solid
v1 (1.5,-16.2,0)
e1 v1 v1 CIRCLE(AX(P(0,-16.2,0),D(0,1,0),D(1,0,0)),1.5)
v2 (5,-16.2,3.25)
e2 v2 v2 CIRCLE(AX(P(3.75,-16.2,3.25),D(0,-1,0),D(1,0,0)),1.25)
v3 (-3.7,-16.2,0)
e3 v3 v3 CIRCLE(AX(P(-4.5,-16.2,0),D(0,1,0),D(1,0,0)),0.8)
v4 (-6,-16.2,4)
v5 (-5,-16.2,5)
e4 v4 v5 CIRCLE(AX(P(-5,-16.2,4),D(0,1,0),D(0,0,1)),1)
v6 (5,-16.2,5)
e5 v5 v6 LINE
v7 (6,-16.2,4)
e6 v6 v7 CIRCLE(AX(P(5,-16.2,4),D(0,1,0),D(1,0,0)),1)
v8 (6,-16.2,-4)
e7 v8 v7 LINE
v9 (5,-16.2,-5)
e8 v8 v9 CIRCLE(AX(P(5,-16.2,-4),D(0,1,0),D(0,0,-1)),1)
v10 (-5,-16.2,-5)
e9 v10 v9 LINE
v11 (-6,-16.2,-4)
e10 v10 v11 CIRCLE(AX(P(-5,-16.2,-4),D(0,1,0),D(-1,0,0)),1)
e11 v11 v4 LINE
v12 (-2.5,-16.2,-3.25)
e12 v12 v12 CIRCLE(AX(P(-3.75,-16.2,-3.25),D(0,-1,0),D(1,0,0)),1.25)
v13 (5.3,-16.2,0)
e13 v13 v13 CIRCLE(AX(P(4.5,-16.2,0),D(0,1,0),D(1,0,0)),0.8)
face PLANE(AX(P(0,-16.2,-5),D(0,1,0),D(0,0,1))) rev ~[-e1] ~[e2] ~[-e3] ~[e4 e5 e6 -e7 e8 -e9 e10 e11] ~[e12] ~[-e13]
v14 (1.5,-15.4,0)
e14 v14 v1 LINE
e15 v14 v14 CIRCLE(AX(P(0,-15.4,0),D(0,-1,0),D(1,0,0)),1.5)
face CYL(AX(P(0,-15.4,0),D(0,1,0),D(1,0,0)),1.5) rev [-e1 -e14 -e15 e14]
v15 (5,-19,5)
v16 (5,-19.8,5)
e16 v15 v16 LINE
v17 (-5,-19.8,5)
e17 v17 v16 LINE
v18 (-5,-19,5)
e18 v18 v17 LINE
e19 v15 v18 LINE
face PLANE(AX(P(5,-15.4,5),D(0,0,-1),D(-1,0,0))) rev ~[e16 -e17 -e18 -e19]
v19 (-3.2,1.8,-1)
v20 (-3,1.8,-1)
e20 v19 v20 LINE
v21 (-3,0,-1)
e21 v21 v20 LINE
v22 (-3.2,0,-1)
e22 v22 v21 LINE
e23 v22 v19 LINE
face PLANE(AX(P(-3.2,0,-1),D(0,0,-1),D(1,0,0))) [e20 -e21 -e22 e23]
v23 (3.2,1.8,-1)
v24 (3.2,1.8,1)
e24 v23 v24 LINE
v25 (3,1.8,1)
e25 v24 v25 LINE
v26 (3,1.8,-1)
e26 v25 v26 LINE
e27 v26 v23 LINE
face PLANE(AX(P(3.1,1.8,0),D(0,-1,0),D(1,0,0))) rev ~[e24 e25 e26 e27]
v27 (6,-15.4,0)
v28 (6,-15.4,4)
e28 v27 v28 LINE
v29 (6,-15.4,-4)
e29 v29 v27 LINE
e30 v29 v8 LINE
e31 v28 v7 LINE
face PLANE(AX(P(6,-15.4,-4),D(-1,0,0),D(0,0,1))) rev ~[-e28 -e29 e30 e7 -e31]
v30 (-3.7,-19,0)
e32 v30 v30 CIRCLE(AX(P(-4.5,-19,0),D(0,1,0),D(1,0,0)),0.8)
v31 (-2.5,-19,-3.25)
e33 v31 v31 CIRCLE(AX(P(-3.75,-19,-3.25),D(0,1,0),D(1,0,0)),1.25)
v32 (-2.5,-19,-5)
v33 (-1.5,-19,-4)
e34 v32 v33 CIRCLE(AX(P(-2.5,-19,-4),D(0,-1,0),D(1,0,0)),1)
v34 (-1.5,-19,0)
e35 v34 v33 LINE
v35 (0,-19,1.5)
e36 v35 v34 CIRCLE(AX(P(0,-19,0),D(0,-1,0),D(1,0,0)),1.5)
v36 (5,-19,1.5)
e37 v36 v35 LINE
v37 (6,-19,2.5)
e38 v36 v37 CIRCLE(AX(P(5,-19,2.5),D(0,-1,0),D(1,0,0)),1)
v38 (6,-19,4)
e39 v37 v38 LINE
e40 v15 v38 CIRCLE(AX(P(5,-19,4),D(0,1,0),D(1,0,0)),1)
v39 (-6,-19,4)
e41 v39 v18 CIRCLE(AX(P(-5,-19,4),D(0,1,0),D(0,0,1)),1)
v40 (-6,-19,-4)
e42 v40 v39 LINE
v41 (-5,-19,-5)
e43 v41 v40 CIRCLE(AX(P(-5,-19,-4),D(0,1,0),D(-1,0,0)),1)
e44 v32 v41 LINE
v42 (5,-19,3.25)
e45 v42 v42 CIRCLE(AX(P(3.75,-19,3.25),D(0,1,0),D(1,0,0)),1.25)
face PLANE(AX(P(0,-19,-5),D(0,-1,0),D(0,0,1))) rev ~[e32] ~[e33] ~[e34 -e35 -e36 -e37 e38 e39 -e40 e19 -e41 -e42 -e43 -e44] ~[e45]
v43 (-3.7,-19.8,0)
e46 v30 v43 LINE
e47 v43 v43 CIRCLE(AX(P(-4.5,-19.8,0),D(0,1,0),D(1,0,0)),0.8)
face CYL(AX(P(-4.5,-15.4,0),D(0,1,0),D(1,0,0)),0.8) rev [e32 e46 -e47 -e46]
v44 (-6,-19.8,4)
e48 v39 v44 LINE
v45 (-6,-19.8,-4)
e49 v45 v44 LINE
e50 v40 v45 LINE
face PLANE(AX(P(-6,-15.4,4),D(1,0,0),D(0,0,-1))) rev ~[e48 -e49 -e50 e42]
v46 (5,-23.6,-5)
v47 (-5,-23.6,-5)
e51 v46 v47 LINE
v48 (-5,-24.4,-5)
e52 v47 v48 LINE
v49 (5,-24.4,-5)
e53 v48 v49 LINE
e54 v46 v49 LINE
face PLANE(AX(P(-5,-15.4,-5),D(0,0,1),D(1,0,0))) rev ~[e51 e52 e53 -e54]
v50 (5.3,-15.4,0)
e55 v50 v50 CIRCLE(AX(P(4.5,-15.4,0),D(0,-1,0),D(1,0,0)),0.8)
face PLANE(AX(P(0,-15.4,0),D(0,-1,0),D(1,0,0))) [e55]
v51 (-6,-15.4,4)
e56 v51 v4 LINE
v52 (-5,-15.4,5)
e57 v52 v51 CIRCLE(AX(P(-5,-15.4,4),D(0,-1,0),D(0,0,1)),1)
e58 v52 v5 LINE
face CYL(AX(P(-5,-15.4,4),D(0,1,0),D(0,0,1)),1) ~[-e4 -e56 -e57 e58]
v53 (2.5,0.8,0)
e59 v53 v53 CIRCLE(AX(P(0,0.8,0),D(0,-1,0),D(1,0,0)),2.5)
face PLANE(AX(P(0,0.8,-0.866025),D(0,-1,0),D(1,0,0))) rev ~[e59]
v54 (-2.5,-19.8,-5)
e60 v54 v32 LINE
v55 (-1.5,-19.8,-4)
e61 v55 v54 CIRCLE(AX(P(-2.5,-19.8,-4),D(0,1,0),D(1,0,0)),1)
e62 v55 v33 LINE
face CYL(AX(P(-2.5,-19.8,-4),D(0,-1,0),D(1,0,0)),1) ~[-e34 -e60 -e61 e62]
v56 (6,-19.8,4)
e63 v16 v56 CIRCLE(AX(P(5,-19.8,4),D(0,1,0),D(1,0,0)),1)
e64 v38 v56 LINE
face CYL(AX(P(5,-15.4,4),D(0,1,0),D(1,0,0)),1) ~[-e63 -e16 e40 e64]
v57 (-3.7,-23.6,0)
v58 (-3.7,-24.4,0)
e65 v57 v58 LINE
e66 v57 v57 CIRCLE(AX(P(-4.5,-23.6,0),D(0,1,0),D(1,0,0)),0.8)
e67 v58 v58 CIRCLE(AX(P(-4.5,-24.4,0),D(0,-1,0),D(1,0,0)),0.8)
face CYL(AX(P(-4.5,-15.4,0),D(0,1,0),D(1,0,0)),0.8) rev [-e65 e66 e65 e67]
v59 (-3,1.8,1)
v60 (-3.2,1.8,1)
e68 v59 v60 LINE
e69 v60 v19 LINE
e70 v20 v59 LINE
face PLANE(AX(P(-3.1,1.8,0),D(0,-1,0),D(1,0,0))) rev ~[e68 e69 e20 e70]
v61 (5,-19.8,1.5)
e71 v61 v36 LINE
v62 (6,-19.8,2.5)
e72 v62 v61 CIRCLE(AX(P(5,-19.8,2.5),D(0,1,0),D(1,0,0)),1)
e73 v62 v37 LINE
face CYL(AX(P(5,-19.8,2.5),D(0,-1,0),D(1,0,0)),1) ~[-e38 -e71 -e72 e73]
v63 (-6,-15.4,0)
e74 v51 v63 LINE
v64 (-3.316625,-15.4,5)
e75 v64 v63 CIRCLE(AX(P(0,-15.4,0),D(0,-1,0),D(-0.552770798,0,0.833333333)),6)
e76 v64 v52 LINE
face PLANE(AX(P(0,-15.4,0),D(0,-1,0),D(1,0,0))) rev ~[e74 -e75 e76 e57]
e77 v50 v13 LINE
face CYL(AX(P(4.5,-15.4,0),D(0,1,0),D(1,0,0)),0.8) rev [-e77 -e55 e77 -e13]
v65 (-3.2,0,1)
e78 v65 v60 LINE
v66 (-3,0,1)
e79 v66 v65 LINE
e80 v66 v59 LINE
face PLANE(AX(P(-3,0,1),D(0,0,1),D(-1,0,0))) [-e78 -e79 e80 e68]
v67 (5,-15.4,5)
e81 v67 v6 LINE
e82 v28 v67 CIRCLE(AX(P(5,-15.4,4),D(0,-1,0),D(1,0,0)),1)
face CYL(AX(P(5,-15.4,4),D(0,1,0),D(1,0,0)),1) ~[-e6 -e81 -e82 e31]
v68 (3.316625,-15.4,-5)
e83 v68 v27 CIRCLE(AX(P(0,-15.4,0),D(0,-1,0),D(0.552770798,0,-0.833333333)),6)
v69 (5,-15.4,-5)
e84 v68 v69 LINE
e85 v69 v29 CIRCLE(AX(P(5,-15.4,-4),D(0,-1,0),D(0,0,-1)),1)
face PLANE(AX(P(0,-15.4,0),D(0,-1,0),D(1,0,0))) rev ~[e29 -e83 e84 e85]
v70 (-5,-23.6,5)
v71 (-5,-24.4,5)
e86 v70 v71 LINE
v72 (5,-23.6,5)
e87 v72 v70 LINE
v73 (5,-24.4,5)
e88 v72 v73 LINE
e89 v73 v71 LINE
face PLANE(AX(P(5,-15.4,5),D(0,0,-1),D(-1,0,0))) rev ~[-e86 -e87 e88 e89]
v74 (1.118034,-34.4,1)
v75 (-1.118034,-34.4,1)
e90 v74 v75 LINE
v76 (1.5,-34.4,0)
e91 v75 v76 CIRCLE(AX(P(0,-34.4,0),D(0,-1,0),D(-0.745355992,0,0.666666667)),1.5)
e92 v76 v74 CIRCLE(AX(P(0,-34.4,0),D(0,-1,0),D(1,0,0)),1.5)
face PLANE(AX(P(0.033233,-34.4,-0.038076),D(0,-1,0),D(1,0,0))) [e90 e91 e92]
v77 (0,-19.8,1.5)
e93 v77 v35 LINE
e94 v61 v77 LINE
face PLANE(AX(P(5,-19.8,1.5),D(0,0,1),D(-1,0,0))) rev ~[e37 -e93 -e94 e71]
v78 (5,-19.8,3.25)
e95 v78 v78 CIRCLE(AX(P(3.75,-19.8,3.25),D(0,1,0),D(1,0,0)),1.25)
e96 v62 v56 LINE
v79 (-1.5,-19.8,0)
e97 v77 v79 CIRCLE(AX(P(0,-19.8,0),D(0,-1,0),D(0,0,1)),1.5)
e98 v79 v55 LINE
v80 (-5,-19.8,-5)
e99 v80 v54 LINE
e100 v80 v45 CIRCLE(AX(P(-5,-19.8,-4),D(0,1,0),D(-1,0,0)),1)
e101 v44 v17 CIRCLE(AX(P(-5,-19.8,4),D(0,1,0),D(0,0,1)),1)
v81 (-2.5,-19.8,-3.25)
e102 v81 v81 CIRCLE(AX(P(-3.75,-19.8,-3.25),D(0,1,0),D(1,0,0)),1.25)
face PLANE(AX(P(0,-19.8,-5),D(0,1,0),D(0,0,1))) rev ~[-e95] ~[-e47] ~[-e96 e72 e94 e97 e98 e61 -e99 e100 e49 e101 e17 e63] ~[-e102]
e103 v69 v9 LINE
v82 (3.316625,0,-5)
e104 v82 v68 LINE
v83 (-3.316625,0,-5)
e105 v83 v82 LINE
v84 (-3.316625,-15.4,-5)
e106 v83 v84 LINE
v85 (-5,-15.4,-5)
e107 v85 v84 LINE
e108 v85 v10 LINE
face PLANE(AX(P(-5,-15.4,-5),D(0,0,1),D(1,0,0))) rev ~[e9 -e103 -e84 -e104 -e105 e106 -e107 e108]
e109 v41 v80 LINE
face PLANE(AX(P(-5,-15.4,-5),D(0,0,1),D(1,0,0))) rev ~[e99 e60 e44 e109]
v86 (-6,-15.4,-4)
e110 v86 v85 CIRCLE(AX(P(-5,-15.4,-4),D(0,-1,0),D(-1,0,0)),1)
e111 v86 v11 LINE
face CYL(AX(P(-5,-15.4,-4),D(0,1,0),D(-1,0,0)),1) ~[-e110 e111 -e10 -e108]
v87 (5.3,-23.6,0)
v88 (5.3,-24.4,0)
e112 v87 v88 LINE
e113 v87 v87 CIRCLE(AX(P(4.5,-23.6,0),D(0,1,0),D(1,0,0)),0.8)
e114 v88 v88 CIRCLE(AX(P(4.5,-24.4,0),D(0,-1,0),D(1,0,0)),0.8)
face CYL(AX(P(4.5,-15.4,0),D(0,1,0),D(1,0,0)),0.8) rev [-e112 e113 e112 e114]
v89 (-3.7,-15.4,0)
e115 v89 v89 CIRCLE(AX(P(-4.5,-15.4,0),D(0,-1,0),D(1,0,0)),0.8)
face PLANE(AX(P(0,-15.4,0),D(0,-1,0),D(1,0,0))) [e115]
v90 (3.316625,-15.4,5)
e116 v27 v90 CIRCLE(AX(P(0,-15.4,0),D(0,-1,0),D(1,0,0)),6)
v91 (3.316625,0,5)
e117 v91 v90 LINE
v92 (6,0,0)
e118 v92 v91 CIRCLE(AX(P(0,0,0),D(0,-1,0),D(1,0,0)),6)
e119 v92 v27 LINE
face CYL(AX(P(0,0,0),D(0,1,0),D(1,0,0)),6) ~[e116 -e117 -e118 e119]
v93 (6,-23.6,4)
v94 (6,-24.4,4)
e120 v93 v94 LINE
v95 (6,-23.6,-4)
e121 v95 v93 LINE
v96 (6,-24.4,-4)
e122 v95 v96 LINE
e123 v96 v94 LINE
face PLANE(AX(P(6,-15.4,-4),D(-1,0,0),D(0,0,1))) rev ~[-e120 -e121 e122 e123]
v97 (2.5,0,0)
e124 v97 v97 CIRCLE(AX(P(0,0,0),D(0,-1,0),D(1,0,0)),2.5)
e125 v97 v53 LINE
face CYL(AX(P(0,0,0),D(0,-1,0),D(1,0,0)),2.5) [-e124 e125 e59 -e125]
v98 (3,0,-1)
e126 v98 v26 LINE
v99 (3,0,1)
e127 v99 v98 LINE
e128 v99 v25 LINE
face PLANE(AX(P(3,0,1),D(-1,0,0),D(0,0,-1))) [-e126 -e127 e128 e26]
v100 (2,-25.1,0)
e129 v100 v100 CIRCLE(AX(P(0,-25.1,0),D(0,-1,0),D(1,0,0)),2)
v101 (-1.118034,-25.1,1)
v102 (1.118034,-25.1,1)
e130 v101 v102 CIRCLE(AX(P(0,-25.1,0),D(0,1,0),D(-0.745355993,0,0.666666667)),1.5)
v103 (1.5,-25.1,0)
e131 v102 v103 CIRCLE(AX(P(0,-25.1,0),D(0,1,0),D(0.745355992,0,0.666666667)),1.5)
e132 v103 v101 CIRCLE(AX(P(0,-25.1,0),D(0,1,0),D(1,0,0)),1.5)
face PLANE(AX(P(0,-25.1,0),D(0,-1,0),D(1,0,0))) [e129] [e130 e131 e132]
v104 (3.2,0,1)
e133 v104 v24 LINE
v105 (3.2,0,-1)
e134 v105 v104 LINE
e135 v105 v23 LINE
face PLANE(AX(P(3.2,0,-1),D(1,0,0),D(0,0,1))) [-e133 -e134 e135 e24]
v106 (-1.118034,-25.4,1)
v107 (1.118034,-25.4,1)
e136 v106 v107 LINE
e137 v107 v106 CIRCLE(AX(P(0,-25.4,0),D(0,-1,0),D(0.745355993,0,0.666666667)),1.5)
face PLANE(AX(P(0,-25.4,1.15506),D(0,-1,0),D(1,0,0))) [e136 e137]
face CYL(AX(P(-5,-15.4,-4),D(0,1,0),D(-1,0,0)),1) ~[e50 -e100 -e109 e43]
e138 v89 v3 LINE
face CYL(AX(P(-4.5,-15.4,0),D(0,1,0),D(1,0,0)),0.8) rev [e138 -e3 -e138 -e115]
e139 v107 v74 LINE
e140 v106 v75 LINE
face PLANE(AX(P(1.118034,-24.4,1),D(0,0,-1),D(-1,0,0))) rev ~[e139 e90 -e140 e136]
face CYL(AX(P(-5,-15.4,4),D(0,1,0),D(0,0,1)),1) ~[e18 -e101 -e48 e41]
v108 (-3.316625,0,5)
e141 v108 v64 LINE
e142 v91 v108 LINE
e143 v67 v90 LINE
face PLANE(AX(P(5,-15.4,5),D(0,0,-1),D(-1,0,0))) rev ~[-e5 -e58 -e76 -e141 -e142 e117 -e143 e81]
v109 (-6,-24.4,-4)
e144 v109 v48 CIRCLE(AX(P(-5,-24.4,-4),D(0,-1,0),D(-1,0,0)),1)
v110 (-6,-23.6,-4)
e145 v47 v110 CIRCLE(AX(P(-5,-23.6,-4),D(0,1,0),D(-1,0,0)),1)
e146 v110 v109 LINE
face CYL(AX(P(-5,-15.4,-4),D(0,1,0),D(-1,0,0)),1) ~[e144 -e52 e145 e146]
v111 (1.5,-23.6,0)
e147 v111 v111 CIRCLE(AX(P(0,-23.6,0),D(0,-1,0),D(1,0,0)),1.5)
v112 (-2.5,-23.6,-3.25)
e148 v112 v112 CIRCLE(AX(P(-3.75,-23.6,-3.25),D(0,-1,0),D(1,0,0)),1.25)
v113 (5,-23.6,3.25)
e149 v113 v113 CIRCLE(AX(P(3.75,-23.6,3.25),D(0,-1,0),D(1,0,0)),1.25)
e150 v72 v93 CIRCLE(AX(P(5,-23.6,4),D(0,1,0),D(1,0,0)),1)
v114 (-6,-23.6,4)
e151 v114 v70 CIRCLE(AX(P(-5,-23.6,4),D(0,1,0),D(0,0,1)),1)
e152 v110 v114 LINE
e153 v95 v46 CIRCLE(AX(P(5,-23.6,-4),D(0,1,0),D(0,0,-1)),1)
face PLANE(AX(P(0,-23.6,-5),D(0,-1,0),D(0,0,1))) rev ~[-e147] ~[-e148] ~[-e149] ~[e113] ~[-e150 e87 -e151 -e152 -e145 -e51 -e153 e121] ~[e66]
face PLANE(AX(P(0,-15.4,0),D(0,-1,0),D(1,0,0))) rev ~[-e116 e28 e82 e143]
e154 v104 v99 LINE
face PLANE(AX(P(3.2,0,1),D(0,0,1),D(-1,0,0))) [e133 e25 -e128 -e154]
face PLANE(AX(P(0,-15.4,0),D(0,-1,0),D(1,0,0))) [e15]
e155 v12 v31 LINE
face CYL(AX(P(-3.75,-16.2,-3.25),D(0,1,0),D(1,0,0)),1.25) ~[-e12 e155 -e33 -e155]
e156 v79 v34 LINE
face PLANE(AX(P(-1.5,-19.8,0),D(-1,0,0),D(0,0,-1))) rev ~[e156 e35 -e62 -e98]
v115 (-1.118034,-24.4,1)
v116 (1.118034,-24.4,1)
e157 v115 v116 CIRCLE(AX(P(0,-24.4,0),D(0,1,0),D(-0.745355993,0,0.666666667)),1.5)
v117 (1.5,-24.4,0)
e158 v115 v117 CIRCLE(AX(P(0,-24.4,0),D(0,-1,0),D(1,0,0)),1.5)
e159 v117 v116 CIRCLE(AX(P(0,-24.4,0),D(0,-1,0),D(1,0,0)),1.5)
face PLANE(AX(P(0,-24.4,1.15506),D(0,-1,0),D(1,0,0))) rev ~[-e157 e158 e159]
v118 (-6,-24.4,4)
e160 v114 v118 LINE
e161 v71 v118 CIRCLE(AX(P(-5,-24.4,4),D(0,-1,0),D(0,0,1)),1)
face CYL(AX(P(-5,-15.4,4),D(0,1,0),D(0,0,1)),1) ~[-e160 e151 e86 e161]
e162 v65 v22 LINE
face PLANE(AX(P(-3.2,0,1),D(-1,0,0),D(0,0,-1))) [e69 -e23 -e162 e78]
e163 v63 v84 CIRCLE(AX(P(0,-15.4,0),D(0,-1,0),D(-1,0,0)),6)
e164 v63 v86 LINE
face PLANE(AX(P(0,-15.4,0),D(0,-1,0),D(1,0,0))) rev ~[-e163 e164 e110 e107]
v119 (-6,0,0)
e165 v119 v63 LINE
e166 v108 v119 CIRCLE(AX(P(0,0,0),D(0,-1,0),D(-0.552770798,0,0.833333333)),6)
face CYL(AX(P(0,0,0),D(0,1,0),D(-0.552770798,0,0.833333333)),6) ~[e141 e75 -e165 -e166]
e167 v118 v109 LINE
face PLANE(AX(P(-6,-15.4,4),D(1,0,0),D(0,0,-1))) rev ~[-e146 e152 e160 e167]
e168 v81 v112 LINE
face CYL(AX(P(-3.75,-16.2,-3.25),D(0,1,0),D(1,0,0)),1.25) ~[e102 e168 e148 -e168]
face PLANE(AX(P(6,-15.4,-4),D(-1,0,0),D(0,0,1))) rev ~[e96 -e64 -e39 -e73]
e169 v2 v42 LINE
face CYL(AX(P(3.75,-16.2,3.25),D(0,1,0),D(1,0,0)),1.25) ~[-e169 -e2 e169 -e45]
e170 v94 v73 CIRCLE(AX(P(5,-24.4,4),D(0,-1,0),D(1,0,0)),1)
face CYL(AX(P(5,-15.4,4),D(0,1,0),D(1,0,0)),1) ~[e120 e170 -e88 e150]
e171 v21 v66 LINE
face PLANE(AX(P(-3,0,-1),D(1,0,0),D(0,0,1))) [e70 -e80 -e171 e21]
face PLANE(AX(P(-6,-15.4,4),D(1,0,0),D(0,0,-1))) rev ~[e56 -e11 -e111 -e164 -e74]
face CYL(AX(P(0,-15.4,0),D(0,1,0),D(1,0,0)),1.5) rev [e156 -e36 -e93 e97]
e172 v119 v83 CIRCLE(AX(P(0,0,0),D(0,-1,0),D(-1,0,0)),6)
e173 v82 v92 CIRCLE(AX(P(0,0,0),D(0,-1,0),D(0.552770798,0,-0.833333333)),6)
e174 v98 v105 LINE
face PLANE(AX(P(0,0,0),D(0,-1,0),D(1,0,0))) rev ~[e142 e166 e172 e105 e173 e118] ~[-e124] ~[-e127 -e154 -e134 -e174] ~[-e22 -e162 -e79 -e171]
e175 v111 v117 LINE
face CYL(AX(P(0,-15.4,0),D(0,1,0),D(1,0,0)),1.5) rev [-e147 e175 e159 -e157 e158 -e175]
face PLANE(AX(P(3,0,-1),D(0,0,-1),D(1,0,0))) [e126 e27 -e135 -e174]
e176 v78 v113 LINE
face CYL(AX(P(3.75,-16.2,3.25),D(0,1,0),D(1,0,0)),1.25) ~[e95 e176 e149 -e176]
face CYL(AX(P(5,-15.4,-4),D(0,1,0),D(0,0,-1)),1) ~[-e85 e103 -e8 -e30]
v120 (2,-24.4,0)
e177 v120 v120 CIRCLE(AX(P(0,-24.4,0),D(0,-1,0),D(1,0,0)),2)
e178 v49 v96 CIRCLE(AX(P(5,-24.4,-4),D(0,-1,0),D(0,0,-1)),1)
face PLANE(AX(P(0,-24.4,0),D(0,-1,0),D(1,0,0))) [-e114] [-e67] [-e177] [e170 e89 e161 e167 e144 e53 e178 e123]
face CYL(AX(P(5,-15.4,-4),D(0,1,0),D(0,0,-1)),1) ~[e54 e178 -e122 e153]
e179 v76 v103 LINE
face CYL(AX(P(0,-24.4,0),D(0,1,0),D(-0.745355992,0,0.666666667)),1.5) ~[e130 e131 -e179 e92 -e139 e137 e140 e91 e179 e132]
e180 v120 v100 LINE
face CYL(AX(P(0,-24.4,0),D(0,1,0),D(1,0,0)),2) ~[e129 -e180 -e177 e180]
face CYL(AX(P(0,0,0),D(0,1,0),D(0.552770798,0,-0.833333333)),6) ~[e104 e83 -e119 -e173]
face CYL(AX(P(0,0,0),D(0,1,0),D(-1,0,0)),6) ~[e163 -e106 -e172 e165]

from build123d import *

# Parameters (mm, degrees)
F1_DEPTH      = 15.4
F3_DEPTH      = 0.8
F4_DEPTH      = 1.8
F5_R          = 0.8
F5_R_2        = 1.5
F6_DEPTH      = 9
F7_W          = 3.8
F7_H          = 10
F7_W_2        = 2.8
F8_DEPTH      = 25
F8_DEPTH_BACK = 25
F10_DEPTH     = 1
F12_R         = 1.25
F13_DEPTH     = 7.4
F15_R         = 2
F16_DEPTH     = 0.7
F17_DEPTH     = 1
F18_DEPTH     = 10


with BuildPart() as f1:
    # F0 (on Front) → F1 (new body)
    with BuildSketch(Plane.XZ):
        with BuildLine():
            ThreePointArc((3.3166247904, -5), (5.2867640737, -2.8372743309), (6, 0))
            ThreePointArc((6, 0), (5.2867640737, 2.8372743309), (3.3166247904, 5))
            Line((3.3166247904, 5), (-3.3166247904, 5))
            ThreePointArc((-3.3166247904, 5), (-5.2867640737, 2.8372743309), (-6, 0))
            ThreePointArc((-6, 0), (-5.2867640737, -2.8372743309), (-3.3166247904, -5))
            Line((-3.3166247904, -5), (3.3166247904, -5))
        make_face()
    extrude(amount=F1_DEPTH)

    # F2 (on Front) → F3 (join)
    with BuildSketch(Plane.XZ):
        with BuildLine():
            Line((2.5, 0), (-2.5, 0))
            ThreePointArc((-2.5, 0), (0, -2.5), (2.5, 0))
        make_face()
        with BuildLine():
            ThreePointArc((2.5, 0), (0, 2.5), (-2.5, 0))
            Line((-2.5, 0), (2.5, 0))
        make_face()
    extrude(amount=-F3_DEPTH)

    # F2 (on Front) → F4 (join)
    with BuildSketch(Plane.XZ):
        Polygon((3, 1), (3, 0), (3, -1), (3.2, -1), (3.2, 1), align=None)
        Polygon((-3, 1), (-3.2, 1), (-3.2, -1), (-3, -1), (-3, 0), align=None)
    extrude(amount=-F4_DEPTH)

    # F5 (on face) → F6 (join)
    with BuildSketch(Plane.XZ.offset(15.4)):
        with BuildLine():
            Line((5, 5), (-5, 5))
            ThreePointArc((-5, 5), (-5.7071067812, 4.7071067812), (-6, 4))
            Line((-6, 4), (-6, -4))
            ThreePointArc((-6, -4), (-5.7071067812, -4.7071067812), (-5, -5))
            Line((-5, -5), (5, -5))
            ThreePointArc((5, -5), (5.7071067812, -4.7071067812), (6, -4))
            Line((6, -4), (6, 4))
            ThreePointArc((6, 4), (5.7071067812, 4.7071067812), (5, 5))
        make_face()
        with Locations((-4.5, 0)):
            Circle(F5_R, mode=Mode.SUBTRACT)
        Circle(F5_R_2, mode=Mode.SUBTRACT)
        with Locations((4.5, 0)):
            Circle(F5_R, mode=Mode.SUBTRACT)
    extrude(amount=F6_DEPTH)

    # F7 (on Right) → F8 (cut, two sides)
    with BuildSketch(Plane.YZ) as f8_sk:
        with Locations((-21.7, 0)):
            Rectangle(F7_W, F7_H)
        with Locations((-17.6, 0)):
            Rectangle(F7_W_2, F7_H)
    extrude(amount=-F8_DEPTH, mode=Mode.SUBTRACT)
    extrude(f8_sk.sketch, amount=F8_DEPTH_BACK, mode=Mode.SUBTRACT)

    # F9 (on face) → F10 (cut)
    with BuildSketch(Plane.XZ.offset(19.8)):
        with BuildLine():
            Line((5, 1.5), (0, 1.5))
            ThreePointArc((0, 1.5), (-1.0606601718, 1.0606601718), (-1.5, 0))
            Line((-1.5, 0), (-1.5, -4))
            ThreePointArc((-1.5, -4), (-1.7928932188, -4.7071067812), (-2.5, -5))
            Line((-2.5, -5), (-2.5, -6))
            Line((-2.5, -6), (-1.5, -6))
            Line((-1.5, -6), (7, -6))
            Line((7, -6), (7, 2.5))
            Line((7, 2.5), (6, 2.5))
            ThreePointArc((6, 2.5), (5.7071067812, 1.7928932188), (5, 1.5))
        make_face()
    extrude(amount=-F10_DEPTH, mode=Mode.SUBTRACT)

    # F12 (on offset) → F13 (join)
    with BuildSketch(Plane.XZ.offset(16.2)):
        with Locations((-3.75, -3.25)):
            Circle(F12_R)
        with Locations((3.75, 3.25)):
            Circle(F12_R)
    extrude(amount=F13_DEPTH)

    # F15 (on offset) → F16 (join)
    with BuildSketch(Plane.XZ.offset(24.4)):
        Circle(F15_R)
        with BuildLine():
            ThreePointArc((1.1180339887, 1), (1.4012585384, 0.5352331347), (1.5, 0))
            ThreePointArc((1.5, 0), (-0.5352331347, -1.4012585384), (-1.1180339887, 1))
            ThreePointArc((-1.1180339887, 1), (0, 1.5), (1.1180339887, 1))
        make_face(mode=Mode.SUBTRACT)
    extrude(amount=F16_DEPTH)

    # F15 (on offset) → F17 (join)
    with BuildSketch(Plane.XZ.offset(24.4)):
        with BuildLine():
            Line((-1.1180339887, 1), (1.1180339887, 1))
            ThreePointArc((1.1180339887, 1), (0, 1.5), (-1.1180339887, 1))
        make_face()
        with BuildLine():
            ThreePointArc((-1.1180339887, 1), (-0.5352331347, -1.4012585384), (1.5, 0))
            ThreePointArc((1.5, 0), (1.4012585384, 0.5352331347), (1.1180339887, 1))
            Line((1.1180339887, 1), (-1.1180339887, 1))
        make_face()
    extrude(amount=F17_DEPTH)

    # F15 (on offset) → F18 (join)
    with BuildSketch(Plane.XZ.offset(24.4)):
        with BuildLine():
            ThreePointArc((-1.1180339887, 1), (-0.5352331347, -1.4012585384), (1.5, 0))
            ThreePointArc((1.5, 0), (1.4012585384, 0.5352331347), (1.1180339887, 1))
            Line((1.1180339887, 1), (-1.1180339887, 1))
        make_face()
    extrude(amount=F18_DEPTH)


solid = f1.part
